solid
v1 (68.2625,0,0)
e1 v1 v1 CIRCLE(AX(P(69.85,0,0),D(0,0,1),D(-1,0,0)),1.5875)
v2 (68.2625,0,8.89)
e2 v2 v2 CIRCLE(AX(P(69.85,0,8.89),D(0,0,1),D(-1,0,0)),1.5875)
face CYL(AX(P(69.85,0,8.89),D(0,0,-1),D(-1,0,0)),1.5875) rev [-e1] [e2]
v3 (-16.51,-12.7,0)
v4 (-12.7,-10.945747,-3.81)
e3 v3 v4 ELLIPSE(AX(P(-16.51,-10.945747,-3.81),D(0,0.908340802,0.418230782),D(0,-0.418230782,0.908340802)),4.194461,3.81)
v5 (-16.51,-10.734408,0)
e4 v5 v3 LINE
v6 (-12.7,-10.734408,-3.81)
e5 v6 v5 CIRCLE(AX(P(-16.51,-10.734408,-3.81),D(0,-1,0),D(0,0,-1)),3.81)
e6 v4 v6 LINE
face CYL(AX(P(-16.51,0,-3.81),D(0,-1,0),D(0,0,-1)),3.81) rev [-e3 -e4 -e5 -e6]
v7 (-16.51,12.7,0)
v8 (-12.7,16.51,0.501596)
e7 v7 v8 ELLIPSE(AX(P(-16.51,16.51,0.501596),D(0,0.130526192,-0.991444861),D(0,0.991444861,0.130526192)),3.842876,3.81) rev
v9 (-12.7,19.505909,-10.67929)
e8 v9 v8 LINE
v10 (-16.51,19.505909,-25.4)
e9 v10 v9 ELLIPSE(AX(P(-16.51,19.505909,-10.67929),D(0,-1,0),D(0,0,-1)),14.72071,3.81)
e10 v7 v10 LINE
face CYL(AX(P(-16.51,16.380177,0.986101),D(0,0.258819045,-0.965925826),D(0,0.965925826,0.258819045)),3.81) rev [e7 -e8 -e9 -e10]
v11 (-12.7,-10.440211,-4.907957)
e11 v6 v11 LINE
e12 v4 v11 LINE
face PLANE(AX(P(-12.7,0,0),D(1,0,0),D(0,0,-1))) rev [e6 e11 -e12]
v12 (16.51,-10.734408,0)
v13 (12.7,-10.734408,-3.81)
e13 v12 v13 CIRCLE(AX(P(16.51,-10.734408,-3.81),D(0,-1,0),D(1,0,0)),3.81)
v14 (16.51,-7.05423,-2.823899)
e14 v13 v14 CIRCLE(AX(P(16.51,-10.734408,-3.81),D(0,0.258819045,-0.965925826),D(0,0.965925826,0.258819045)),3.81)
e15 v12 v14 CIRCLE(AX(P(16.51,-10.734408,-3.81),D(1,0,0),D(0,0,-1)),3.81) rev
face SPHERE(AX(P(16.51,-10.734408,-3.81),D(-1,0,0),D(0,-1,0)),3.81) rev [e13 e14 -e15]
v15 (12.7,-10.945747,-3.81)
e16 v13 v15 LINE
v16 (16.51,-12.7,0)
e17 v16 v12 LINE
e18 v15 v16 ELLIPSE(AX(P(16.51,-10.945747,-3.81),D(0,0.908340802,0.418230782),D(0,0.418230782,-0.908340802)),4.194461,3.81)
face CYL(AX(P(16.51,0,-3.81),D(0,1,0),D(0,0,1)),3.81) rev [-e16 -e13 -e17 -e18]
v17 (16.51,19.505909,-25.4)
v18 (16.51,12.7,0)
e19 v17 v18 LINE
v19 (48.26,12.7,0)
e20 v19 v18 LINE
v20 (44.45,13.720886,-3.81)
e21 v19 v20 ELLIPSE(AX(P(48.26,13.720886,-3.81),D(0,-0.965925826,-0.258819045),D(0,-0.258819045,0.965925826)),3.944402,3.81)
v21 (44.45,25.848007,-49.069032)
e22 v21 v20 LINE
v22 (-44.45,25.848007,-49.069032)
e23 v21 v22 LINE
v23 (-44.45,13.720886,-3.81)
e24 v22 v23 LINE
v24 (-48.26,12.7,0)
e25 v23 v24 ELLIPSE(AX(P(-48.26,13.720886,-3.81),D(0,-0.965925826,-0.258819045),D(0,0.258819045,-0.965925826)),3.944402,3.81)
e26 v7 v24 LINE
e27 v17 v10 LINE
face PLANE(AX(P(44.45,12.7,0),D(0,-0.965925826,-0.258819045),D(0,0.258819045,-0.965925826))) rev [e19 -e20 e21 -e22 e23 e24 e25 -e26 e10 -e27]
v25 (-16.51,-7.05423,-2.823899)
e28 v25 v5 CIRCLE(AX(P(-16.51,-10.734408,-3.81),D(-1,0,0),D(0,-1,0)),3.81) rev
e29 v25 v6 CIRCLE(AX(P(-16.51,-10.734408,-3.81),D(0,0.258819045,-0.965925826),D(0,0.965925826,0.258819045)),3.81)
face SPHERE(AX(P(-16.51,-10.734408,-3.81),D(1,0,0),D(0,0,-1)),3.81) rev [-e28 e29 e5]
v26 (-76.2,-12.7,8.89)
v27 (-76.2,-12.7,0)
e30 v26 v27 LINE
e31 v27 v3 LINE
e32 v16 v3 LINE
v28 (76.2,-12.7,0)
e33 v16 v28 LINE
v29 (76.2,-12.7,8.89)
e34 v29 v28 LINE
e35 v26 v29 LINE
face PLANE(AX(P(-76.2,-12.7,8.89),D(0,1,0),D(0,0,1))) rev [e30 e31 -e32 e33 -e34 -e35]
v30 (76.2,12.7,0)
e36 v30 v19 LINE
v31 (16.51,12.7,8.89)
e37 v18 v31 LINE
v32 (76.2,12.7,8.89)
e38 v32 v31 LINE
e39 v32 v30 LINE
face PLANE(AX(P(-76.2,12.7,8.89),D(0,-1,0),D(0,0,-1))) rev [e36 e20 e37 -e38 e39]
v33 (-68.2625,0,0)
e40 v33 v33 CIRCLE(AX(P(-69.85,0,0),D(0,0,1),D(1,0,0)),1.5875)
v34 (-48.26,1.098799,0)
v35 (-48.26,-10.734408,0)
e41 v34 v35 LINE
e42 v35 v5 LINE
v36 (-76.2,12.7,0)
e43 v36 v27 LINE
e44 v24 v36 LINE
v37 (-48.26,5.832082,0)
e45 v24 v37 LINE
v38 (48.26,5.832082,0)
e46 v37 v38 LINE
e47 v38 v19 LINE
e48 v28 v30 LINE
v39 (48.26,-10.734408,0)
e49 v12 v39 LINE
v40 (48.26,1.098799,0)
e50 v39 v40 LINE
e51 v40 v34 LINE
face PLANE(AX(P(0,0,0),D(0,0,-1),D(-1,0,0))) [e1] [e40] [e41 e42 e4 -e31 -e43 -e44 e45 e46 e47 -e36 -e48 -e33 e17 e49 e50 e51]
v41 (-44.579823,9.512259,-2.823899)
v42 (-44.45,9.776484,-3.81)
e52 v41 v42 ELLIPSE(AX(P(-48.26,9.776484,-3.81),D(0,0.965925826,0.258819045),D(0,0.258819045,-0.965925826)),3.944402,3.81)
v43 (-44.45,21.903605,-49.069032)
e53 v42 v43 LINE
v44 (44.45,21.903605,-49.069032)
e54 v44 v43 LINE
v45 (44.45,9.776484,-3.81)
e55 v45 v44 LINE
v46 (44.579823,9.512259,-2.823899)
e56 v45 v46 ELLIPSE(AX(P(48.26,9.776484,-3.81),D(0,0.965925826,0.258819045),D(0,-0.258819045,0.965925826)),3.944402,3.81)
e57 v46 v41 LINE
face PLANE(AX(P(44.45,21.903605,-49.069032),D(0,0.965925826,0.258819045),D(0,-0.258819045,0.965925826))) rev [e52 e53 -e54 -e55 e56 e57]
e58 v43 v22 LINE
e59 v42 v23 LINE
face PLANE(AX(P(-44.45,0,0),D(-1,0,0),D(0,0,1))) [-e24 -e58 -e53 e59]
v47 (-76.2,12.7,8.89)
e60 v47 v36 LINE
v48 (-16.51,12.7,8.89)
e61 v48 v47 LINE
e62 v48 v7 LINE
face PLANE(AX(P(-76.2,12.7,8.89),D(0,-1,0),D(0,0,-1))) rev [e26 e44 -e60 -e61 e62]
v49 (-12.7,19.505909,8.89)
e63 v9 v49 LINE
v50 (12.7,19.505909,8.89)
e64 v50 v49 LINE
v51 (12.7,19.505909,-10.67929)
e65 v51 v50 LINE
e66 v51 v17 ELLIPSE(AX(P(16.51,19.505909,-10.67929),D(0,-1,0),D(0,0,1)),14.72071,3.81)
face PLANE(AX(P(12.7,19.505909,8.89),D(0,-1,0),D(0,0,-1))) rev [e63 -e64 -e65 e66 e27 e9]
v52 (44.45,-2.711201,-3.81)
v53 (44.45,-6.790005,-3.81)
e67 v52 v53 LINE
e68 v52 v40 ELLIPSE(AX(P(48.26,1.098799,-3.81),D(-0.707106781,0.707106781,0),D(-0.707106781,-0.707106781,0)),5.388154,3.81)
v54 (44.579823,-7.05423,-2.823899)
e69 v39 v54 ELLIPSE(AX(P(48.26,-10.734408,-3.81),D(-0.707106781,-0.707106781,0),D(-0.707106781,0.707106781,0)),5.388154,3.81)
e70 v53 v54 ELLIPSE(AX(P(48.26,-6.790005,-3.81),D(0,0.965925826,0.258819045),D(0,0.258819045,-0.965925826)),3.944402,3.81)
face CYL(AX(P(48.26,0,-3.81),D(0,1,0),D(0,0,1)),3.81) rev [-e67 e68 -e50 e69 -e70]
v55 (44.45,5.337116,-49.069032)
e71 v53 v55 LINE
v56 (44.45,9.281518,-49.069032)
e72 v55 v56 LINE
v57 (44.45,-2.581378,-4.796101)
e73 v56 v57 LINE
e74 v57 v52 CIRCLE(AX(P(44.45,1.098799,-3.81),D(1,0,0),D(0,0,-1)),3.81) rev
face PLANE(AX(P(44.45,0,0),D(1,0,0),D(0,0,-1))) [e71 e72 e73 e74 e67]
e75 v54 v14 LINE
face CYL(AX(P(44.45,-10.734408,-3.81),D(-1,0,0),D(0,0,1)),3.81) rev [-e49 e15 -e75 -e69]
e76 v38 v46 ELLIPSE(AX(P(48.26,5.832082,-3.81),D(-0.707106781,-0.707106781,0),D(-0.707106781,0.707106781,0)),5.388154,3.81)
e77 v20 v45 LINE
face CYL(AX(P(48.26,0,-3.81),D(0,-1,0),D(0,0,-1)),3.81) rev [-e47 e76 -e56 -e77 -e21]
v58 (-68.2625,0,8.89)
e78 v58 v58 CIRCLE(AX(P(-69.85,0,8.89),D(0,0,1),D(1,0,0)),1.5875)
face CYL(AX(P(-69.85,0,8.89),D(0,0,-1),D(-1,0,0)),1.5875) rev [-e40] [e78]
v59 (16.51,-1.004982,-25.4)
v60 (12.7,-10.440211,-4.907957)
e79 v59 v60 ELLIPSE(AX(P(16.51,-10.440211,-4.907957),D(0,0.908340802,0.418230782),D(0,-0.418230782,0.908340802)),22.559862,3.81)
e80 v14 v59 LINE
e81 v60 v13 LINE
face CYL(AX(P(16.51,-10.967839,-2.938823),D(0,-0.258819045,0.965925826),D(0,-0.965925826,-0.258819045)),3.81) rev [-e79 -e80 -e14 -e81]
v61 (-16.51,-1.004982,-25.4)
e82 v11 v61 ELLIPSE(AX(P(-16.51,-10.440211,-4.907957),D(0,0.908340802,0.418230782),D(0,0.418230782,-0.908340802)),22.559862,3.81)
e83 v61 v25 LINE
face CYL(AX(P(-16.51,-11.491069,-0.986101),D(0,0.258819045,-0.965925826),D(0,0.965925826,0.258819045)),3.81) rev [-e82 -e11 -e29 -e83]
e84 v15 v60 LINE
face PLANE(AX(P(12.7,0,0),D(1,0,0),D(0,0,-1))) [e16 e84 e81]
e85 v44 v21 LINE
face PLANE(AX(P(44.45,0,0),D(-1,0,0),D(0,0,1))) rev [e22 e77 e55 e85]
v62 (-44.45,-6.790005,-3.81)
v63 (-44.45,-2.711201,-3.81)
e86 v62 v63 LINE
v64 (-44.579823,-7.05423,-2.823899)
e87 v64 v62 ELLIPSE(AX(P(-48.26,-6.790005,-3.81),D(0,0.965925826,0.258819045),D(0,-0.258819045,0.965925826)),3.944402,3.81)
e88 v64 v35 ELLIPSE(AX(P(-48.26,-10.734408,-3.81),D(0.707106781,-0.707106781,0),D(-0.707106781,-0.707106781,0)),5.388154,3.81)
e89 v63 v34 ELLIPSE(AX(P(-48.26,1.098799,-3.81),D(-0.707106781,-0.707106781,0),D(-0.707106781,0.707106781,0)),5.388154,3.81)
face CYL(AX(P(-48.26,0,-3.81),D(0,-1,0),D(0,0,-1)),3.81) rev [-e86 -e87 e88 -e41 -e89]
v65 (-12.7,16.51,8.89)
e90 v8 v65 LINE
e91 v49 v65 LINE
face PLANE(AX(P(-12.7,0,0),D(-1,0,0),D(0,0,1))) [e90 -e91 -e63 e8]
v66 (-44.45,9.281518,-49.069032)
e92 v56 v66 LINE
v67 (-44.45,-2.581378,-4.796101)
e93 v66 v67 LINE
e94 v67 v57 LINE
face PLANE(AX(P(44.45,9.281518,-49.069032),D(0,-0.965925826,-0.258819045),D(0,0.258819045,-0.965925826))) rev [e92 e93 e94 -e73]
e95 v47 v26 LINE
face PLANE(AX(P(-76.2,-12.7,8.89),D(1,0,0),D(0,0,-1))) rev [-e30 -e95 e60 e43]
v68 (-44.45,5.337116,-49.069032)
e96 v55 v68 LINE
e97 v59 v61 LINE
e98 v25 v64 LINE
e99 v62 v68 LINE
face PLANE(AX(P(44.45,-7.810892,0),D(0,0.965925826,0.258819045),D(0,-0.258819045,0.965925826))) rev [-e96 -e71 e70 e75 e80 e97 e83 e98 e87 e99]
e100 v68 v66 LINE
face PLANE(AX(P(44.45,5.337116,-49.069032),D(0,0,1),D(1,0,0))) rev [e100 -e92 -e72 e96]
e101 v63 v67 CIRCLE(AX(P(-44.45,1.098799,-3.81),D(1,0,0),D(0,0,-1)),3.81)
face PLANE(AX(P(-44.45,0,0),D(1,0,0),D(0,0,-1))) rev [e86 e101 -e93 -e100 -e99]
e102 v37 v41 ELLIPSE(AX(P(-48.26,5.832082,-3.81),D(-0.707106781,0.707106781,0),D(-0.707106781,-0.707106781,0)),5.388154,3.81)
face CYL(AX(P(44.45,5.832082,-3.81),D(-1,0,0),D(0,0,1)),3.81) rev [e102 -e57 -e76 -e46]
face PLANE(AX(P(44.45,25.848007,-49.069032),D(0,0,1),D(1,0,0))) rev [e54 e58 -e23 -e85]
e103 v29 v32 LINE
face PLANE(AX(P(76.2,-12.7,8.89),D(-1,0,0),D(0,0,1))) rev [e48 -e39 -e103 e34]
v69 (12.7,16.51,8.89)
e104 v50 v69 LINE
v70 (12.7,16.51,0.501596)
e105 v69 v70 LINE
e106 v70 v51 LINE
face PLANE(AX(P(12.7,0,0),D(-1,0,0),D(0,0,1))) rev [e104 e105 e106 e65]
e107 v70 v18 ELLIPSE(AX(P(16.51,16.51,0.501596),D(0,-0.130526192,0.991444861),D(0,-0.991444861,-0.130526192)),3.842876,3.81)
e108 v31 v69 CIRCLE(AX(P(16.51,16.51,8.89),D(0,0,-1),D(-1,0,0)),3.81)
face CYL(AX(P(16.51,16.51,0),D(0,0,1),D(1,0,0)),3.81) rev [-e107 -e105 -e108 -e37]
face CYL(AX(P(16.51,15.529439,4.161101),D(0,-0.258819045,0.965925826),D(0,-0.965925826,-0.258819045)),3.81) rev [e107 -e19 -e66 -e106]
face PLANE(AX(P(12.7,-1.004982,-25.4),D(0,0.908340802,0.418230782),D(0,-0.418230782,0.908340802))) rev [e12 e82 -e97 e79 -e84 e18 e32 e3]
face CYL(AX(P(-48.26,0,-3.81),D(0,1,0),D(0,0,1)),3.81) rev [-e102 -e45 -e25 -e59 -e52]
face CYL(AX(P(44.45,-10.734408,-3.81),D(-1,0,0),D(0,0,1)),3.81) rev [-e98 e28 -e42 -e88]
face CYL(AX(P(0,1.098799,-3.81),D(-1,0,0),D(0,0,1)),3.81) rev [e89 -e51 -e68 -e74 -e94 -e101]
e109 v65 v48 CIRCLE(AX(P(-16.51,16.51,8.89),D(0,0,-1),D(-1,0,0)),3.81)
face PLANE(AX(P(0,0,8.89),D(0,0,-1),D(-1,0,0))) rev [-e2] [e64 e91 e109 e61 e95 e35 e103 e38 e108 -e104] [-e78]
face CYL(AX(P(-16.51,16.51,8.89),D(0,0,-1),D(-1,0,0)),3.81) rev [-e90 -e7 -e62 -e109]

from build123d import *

# Parameters (mm, degrees)
SKETCH1_W           = 152.4
SKETCH1_H           = 25.4
SKETCH1_R           = 1.5875
BOSS_EXTRUDE1_DEPTH = 8.89
BOSS_EXTRUDE2_DEPTH = 44.45
BOSS_EXTRUDE3_DEPTH = 12.7
FILLET1_R           = 3.81


with BuildPart() as part:
    # Sketch1 → Boss-Extrude1 (new body)
    with BuildSketch(Plane.XY):
        Rectangle(SKETCH1_W, SKETCH1_H)
        with Locations((-69.85, 0)):
            Circle(SKETCH1_R, mode=Mode.SUBTRACT)
        with Locations(Location((69.85, 0, 0), (0, 0, 180))):
            Circle(SKETCH1_R, mode=Mode.SUBTRACT)
    extrude(amount=BOSS_EXTRUDE1_DEPTH)

    # Sketch2 → Boss-Extrude2 (add, symmetric)
    with BuildSketch(Plane(origin=(0, 0, 0), x_dir=(0, 0, -1), z_dir=(1, 0, 0))):
        Polygon((0, 8.755597753), (0, 12.7), (49.069031975, 25.848007491), (49.069031975, 21.903605244), align=None)
        Polygon((0, -3.866489439), (0, -7.810891686), (49.069031975, 5.337115805), (49.069031975, 9.281518052), align=None)
    extrude(amount=BOSS_EXTRUDE2_DEPTH, both=True)

    # Sketch3 → Boss-Extrude3 (add, symmetric)
    with BuildSketch(Plane(origin=(0, 0, 0), x_dir=(0, 0, -1), z_dir=(1, 0, 0))):
        Polygon((-8.89, 12.7), (-8.89, 19.505909488), (25.4, 19.505909488), (0, 12.7), align=None)
        Polygon((25.4, -1.004982199), (0, -12.7), (0, -7.810891686), align=None)
    extrude(amount=BOSS_EXTRUDE3_DEPTH, both=True)

    # Fillet1
    # the kernel refuses this fillet: 3.81 mm, written as the material it adds along each edge
    with BuildSketch(Plane(origin=(16.51, -10.73440751, -3.81), x_dir=(0, 0, 1), z_dir=(-1, 0, 0))) as fillet1_piece_1_section:
        Polygon((0, 0), (FILLET1_R, 0), (FILLET1_R, FILLET1_R * 0.767326987979), (FILLET1_R * 0.258819045103, FILLET1_R * 0.965925826289), align=None)
    fillet1_piece_1 = extrude(amount=FILLET1_R, mode=Mode.PRIVATE)
    fillet1_piece_1 = fillet1_piece_1 - Plane(origin=(16.51, -10.73440751, -3.81), x_dir=(0, -0.6087614290087219, -0.7933533402912344), z_dir=(-1, 0, 0)) * Sphere(FILLET1_R, mode=Mode.PRIVATE)
    add(fillet1_piece_1)
    with BuildSketch(Plane(origin=(-16.51, -10.73440751, -3.81), x_dir=(0, 0, 1), z_dir=(1, 0, 0))) as fillet1_piece_2_section:
        Polygon((0, 0), (FILLET1_R, 0), (FILLET1_R, -FILLET1_R * 0.767326987979), (FILLET1_R * 0.258819045103, -FILLET1_R * 0.965925826289), align=None)
    fillet1_piece_2 = extrude(amount=FILLET1_R, mode=Mode.PRIVATE)
    fillet1_piece_2 = fillet1_piece_2 - Plane(origin=(-16.51, -10.73440751, -3.81), x_dir=(0, -0.6087614290087219, -0.7933533402912344), z_dir=(1, 0, 0)) * Sphere(FILLET1_R, mode=Mode.PRIVATE)
    add(fillet1_piece_2)
    with BuildSketch(Plane(origin=(-44.45, 8.755597753, 0), x_dir=(0, -1, 0), z_dir=(1, 0, 0))) as fillet1_piece_3:
        with BuildLine():
            CenterArc((FILLET1_R * 0.767326987979, FILLET1_R), FILLET1_R, 195, 75)
            Line((-FILLET1_R * 0.19859883831, FILLET1_R * 0.741180954897), (0, 0))
            Line((0, 0), (FILLET1_R * 0.767326987979, 0))
        make_face()
    extrude(amount=88.9)
    with BuildSketch(Plane(origin=(-44.45, -0.769402247, 0), x_dir=(-1, 0, 0), z_dir=(0, 1, 0))) as fillet1_piece_4_section:
        with BuildLine():
            CenterArc((FILLET1_R, -FILLET1_R), FILLET1_R, 90, 90)
            Line((0, -FILLET1_R), (0, 0))
            Line((0, 0), (FILLET1_R, 0))
        make_face()
    fillet1_piece_4 = extrude(amount=13.469402247, mode=Mode.PRIVATE)
    fillet1_piece_4 = split(fillet1_piece_4, bisect_by=Plane(origin=(-45.341111067, 12.778682572, -0.293647356), z_dir=(0, -0.9659258262890691, -0.25881904510251785)), keep=Keep.TOP, mode=Mode.PRIVATE)
    fillet1_piece_4 = split(fillet1_piece_4, bisect_by=Plane(origin=(-45.341111067, 9.098505174, -1.279747918), z_dir=(0, 0.9659258262890691, 0.258819045102518)), keep=Keep.TOP, mode=Mode.PRIVATE)
    add(fillet1_piece_4)
    with BuildSketch(Plane(origin=(-44.45, -0.769402247, 0), x_dir=(-1, 0, 0), z_dir=(0, 1, 0))) as fillet1_piece_5_section:
        with BuildLine():
            CenterArc((FILLET1_R, -FILLET1_R), FILLET1_R, 90, 90)
            Line((0, -FILLET1_R), (0, 0))
            Line((0, 0), (FILLET1_R, 0))
        make_face()
    fillet1_piece_5 = extrude(amount=22.994402247, mode=Mode.PRIVATE)
    fillet1_piece_5 = split(fillet1_piece_5, bisect_by=Plane(origin=(-44.855660273, 12.7, -1.638749777), z_dir=(0, 1, 0)), keep=Keep.TOP, mode=Mode.PRIVATE)
    fillet1_piece_5 = split(fillet1_piece_5, bisect_by=Plane(origin=(-44.855660273, 13.124394562, -1.583862067), z_dir=(0, -0.9659258262890691, -0.25881904510251785)), keep=Keep.TOP, mode=Mode.PRIVATE)
    add(fillet1_piece_5)
    with BuildSketch(Plane(origin=(44.45, -0.769402247, 0), x_dir=(1, 0, 0), z_dir=(0, 1, 0))) as fillet1_piece_6_section:
        with BuildLine():
            CenterArc((FILLET1_R, FILLET1_R), FILLET1_R, 180, 90)
            Line((0, FILLET1_R), (0, 0))
            Line((0, 0), (FILLET1_R, 0))
        make_face()
    fillet1_piece_6 = extrude(amount=13.469402247, mode=Mode.PRIVATE)
    fillet1_piece_6 = split(fillet1_piece_6, bisect_by=Plane(origin=(45.341111067, 9.098505174, -1.279747918), z_dir=(0, 0.9659258262890691, 0.258819045102518)), keep=Keep.TOP, mode=Mode.PRIVATE)
    fillet1_piece_6 = split(fillet1_piece_6, bisect_by=Plane(origin=(45.341111067, 12.778682572, -0.293647356), z_dir=(0, -0.9659258262890691, -0.25881904510251785)), keep=Keep.TOP, mode=Mode.PRIVATE)
    add(fillet1_piece_6)
    with BuildSketch(Plane(origin=(44.45, -0.769402247, 0), x_dir=(1, 0, 0), z_dir=(0, 1, 0))) as fillet1_piece_7_section:
        with BuildLine():
            CenterArc((FILLET1_R, FILLET1_R), FILLET1_R, 180, 90)
            Line((0, FILLET1_R), (0, 0))
            Line((0, 0), (FILLET1_R, 0))
        make_face()
    fillet1_piece_7 = extrude(amount=22.994402247, mode=Mode.PRIVATE)
    fillet1_piece_7 = split(fillet1_piece_7, bisect_by=Plane(origin=(44.855660273, 12.7, -1.638749777), z_dir=(0, 1, 0)), keep=Keep.TOP, mode=Mode.PRIVATE)
    fillet1_piece_7 = split(fillet1_piece_7, bisect_by=Plane(origin=(44.855660273, 13.124394562, -1.583862067), z_dir=(0, -0.9659258262890691, -0.25881904510251785)), keep=Keep.TOP, mode=Mode.PRIVATE)
    add(fillet1_piece_7)
    with BuildSketch(Plane(origin=(-44.45, 5.658510561, 0), x_dir=(-1, 0, 0), z_dir=(0, -1, 0))) as fillet1_piece_8_section:
        with BuildLine():
            CenterArc((FILLET1_R, FILLET1_R), FILLET1_R, 180, 90)
            Line((0, FILLET1_R), (0, 0))
            Line((0, 0), (FILLET1_R, 0))
        make_face()
    fillet1_piece_8 = extrude(amount=22.994402247, mode=Mode.PRIVATE)
    fillet1_piece_8 = split(fillet1_piece_8, bisect_by=Plane(origin=(-45.312565385, -7.447655563, -1.355615666), z_dir=(0, 0.9659258262890691, 0.25881904510251813)), keep=Keep.TOP, mode=Mode.PRIVATE)
    fillet1_piece_8 = split(fillet1_piece_8, bisect_by=Plane(origin=(-45.312565385, -3.767478165, -0.369515104), z_dir=(0, -0.9659258262890691, -0.2588190451025181)), keep=Keep.TOP, mode=Mode.PRIVATE)
    add(fillet1_piece_8)
    with BuildSketch(Plane(origin=(44.45, -3.866489439, 0), x_dir=(0, 1, 0), z_dir=(-1, 0, 0))) as fillet1_piece_9:
        with BuildLine():
            CenterArc((FILLET1_R * 1.30322537284, FILLET1_R), FILLET1_R, 165, 105)
            Line((FILLET1_R * 0.337299546552, FILLET1_R * 1.2588190451), (0, 0))
            Line((0, 0), (FILLET1_R * 1.30322537284, 0))
        make_face()
    extrude(amount=88.9)
    with BuildSketch(Plane(origin=(16.51, -7.810891686, 0), x_dir=(0, -1, 0), z_dir=(1, 0, 0)), Plane(origin=(-44.45, -7.810891686, 0), x_dir=(0, -1, 0), z_dir=(1, 0, 0))) as fillet1_piece_10:
        with BuildLine():
            CenterArc((FILLET1_R * 0.767326987979, FILLET1_R), FILLET1_R, 195, 75)
            Line((-FILLET1_R * 0.19859883831, FILLET1_R * 0.741180954897), (0, 0))
            Line((0, 0), (FILLET1_R * 0.767326987979, 0))
        make_face()
    extrude(amount=27.94)
    with BuildSketch(Plane(origin=(44.45, 5.658510561, 0), x_dir=(1, 0, 0), z_dir=(0, -1, 0))) as fillet1_piece_11_section:
        with BuildLine():
            CenterArc((FILLET1_R, -FILLET1_R), FILLET1_R, 90, 90)
            Line((0, -FILLET1_R), (0, 0))
            Line((0, 0), (FILLET1_R, 0))
        make_face()
    fillet1_piece_11 = extrude(amount=22.994402247, mode=Mode.PRIVATE)
    fillet1_piece_11 = split(fillet1_piece_11, bisect_by=Plane(origin=(45.312565385, -7.447655563, -1.355615666), z_dir=(0, 0.9659258262890691, 0.25881904510251813)), keep=Keep.TOP, mode=Mode.PRIVATE)
    fillet1_piece_11 = split(fillet1_piece_11, bisect_by=Plane(origin=(45.312565385, -3.767478165, -0.369515104), z_dir=(0, -0.9659258262890691, -0.2588190451025181)), keep=Keep.TOP, mode=Mode.PRIVATE)
    add(fillet1_piece_11)
    with BuildSketch(Plane(origin=(-12.7, 12.7, -9.525), x_dir=(-1, 0, 0), z_dir=(0, 0, 1))) as fillet1_piece_12:
        with BuildLine():
            CenterArc((FILLET1_R, -FILLET1_R), FILLET1_R, 90, 90)
            Line((0, -FILLET1_R), (0, 0))
            Line((0, 0), (FILLET1_R, 0))
        make_face()
    extrude(amount=18.415)
    with BuildSketch(Plane(origin=(-12.7, 21.971160892, -34.600443495), x_dir=(0, 0.9659258262890691, 0.2588190451025179), z_dir=(0, -0.2588190451025179, 0.9659258262890691))) as fillet1_piece_13_section:
        with BuildLine():
            CenterArc((FILLET1_R, FILLET1_R), FILLET1_R, 180, 90)
            Line((0, FILLET1_R), (0, 0))
            Line((0, 0), (FILLET1_R, 0))
        make_face()
    fillet1_piece_13 = extrude(amount=45.346014982, mode=Mode.PRIVATE)
    fillet1_piece_13 = split(fillet1_piece_13, bisect_by=Plane(origin=(-13.567705221, 16.120661603, 8.89), z_dir=(0, 0, -1)), keep=Keep.TOP, mode=Mode.PRIVATE)
    fillet1_piece_13 = split(fillet1_piece_13, bisect_by=Plane(origin=(-13.567705221, 19.505909488, -9.486038737), z_dir=(0, -1, 0)), keep=Keep.TOP, mode=Mode.PRIVATE)
    add(fillet1_piece_13)
    with BuildSketch(Plane(origin=(12.7, 12.7, -9.525), x_dir=(1, 0, 0), z_dir=(0, 0, 1))) as fillet1_piece_14:
        with BuildLine():
            CenterArc((FILLET1_R, FILLET1_R), FILLET1_R, 180, 90)
            Line((0, FILLET1_R), (0, 0))
            Line((0, 0), (FILLET1_R, 0))
        make_face()
    extrude(amount=18.415)
    with BuildSketch(Plane(origin=(12.7, 21.971160892, -34.600443495), x_dir=(1, 0, 0), z_dir=(0, -0.2588190451025179, 0.9659258262890691))) as fillet1_piece_15_section:
        with BuildLine():
            CenterArc((FILLET1_R, FILLET1_R), FILLET1_R, 180, 90)
            Line((0, FILLET1_R), (0, 0))
            Line((0, 0), (FILLET1_R, 0))
        make_face()
    fillet1_piece_15 = extrude(amount=45.346014982, mode=Mode.PRIVATE)
    fillet1_piece_15 = split(fillet1_piece_15, bisect_by=Plane(origin=(13.56770522, 16.120661606, 8.89), z_dir=(0, 0, -1)), keep=Keep.TOP, mode=Mode.PRIVATE)
    fillet1_piece_15 = split(fillet1_piece_15, bisect_by=Plane(origin=(13.56770522, 19.505909488, -9.486038751), z_dir=(0, -1, 0)), keep=Keep.TOP, mode=Mode.PRIVATE)
    add(fillet1_piece_15)
    with BuildSketch(Plane(origin=(-12.7, -7.054230112, -2.823899438), x_dir=(-1, 0, 0), z_dir=(0, 0.2588190451025182, -0.965925826289069))) as fillet1_piece_16_section:
        with BuildLine():
            CenterArc((FILLET1_R, -FILLET1_R), FILLET1_R, 90, 90)
            Line((0, -FILLET1_R), (0, 0))
            Line((0, 0), (FILLET1_R, 0))
        make_face()
    fillet1_piece_16 = extrude(amount=32.897499158, mode=Mode.PRIVATE)
    fillet1_piece_16 = split(fillet1_piece_16, bisect_by=Plane(origin=(-13.689407804, -6.647394043, -13.145443122), z_dir=(0, 0.9083408023896492, 0.41823078164349436)), keep=Keep.TOP, mode=Mode.PRIVATE)
    add(fillet1_piece_16)
    with BuildSketch(Plane(origin=(-12.7, -12.7, 0), x_dir=(-1, 0, 0), z_dir=(0, 1, 0))) as fillet1_piece_17_section:
        with BuildLine():
            CenterArc((FILLET1_R, -FILLET1_R), FILLET1_R, 90, 90)
            Line((0, -FILLET1_R), (0, 0))
            Line((0, 0), (FILLET1_R, 0))
        make_face()
    fillet1_piece_17 = extrude(amount=1.96559249, mode=Mode.PRIVATE)
    fillet1_piece_17 = split(fillet1_piece_17, bisect_by=Plane(origin=(-13.67877404, -12.248464892, -0.980673303), z_dir=(0, 0.9083408023896492, 0.41823078164349436)), keep=Keep.TOP, mode=Mode.PRIVATE)
    add(fillet1_piece_17)
    with BuildSketch(Plane(origin=(12.7, -7.054230112, -2.823899438), x_dir=(0, -0.965925826289069, -0.2588190451025182), z_dir=(0, 0.2588190451025182, -0.965925826289069))) as fillet1_piece_18_section:
        with BuildLine():
            CenterArc((FILLET1_R, -FILLET1_R), FILLET1_R, 90, 90)
            Line((0, -FILLET1_R), (0, 0))
            Line((0, 0), (FILLET1_R, 0))
        make_face()
    fillet1_piece_18 = extrude(amount=32.897499158, mode=Mode.PRIVATE)
    fillet1_piece_18 = split(fillet1_piece_18, bisect_by=Plane(origin=(13.689407804, -6.647394043, -13.145443122), z_dir=(0, 0.9083408023896492, 0.41823078164349436)), keep=Keep.TOP, mode=Mode.PRIVATE)
    add(fillet1_piece_18)
    with BuildSketch(Plane(origin=(12.7, -12.7, 0), x_dir=(1, 0, 0), z_dir=(0, 1, 0))) as fillet1_piece_19_section:
        with BuildLine():
            CenterArc((FILLET1_R, FILLET1_R), FILLET1_R, 180, 90)
            Line((0, FILLET1_R), (0, 0))
            Line((0, 0), (FILLET1_R, 0))
        make_face()
    fillet1_piece_19 = extrude(amount=1.96559249, mode=Mode.PRIVATE)
    fillet1_piece_19 = split(fillet1_piece_19, bisect_by=Plane(origin=(13.67877404, -12.248464892, -0.980673303), z_dir=(0, 0.9083408023896492, 0.41823078164349436)), keep=Keep.TOP, mode=Mode.PRIVATE)
    add(fillet1_piece_19)
    with BuildSketch(Plane(origin=(-44.45, -0.769402247, 0), x_dir=(-1, 0, 0), z_dir=(0, 1, 0))) as fillet1_piece_20a_section:
        with BuildLine():
            CenterArc((FILLET1_R, -FILLET1_R), FILLET1_R, 90, 90)
            Line((0, -FILLET1_R), (0, 0))
            Line((0, 0), (FILLET1_R, 0))
        make_face()
    fillet1_piece_20a = extrude(amount=13.469402247, mode=Mode.PRIVATE)
    fillet1_piece_20a = split(fillet1_piece_20a, bisect_by=Plane(origin=(-45.301618927, 8.664751894, 0.339041359), z_dir=(0, -0.9659258262890691, -0.258819045102518)), keep=Keep.TOP, mode=Mode.PRIVATE)
    with BuildSketch(Plane(origin=(-51.75878956, 8.755597753, 0), x_dir=(0, -1, 0), z_dir=(1, 0, 0))) as fillet1_piece_20b_section:
        with BuildLine():
            CenterArc((FILLET1_R * 0.767326987979, FILLET1_R), FILLET1_R, 195, 75)
            Line((-FILLET1_R * 0.19859883831, FILLET1_R * 0.741180954897), (0, 0))
            Line((0, 0), (FILLET1_R * 0.767326987979, 0))
        make_face()
    fillet1_piece_20b = extrude(amount=96.20878956, mode=Mode.PRIVATE)
    fillet1_piece_20b = split(fillet1_piece_20b, bisect_by=Plane(origin=(-44.45, 8.277292098, -0.623340065), z_dir=(-1, 0, 0)), keep=Keep.TOP, mode=Mode.PRIVATE)
    fillet1_piece_20 = fillet1_piece_20a & fillet1_piece_20b
    add(fillet1_piece_20)
    with BuildSketch(Plane(origin=(-44.45, 8.755597753, 0), x_dir=(0, -1, 0), z_dir=(1, 0, 0))) as fillet1_piece_21a_section:
        with BuildLine():
            CenterArc((FILLET1_R * 0.767326987979, FILLET1_R), FILLET1_R, 195, 75)
            Line((-FILLET1_R * 0.19859883831, FILLET1_R * 0.741180954897), (0, 0))
            Line((0, 0), (FILLET1_R * 0.767326987979, 0))
        make_face()
    fillet1_piece_21a = extrude(amount=96.20878956, mode=Mode.PRIVATE)
    fillet1_piece_21a = split(fillet1_piece_21a, bisect_by=Plane(origin=(44.45, 8.277292098, -0.623340065), z_dir=(1, 0, 0)), keep=Keep.TOP, mode=Mode.PRIVATE)
    with BuildSketch(Plane(origin=(44.45, -0.769402247, 0), x_dir=(1, 0, 0), z_dir=(0, 1, 0))) as fillet1_piece_21b_section:
        with BuildLine():
            CenterArc((FILLET1_R, FILLET1_R), FILLET1_R, 180, 90)
            Line((0, FILLET1_R), (0, 0))
            Line((0, 0), (FILLET1_R, 0))
        make_face()
    fillet1_piece_21b = extrude(amount=13.469402247, mode=Mode.PRIVATE)
    fillet1_piece_21b = split(fillet1_piece_21b, bisect_by=Plane(origin=(45.301618927, 8.664751894, 0.339041359), z_dir=(0, -0.9659258262890691, -0.258819045102518)), keep=Keep.TOP, mode=Mode.PRIVATE)
    fillet1_piece_21 = fillet1_piece_21a & fillet1_piece_21b
    add(fillet1_piece_21)
    with BuildSketch(Plane(origin=(44.45, -3.866489439, 0), x_dir=(0, 1, 0), z_dir=(-1, 0, 0))) as fillet1_piece_22a_section:
        with BuildLine():
            CenterArc((FILLET1_R * 1.30322537284, FILLET1_R), FILLET1_R, 165, 105)
            Line((FILLET1_R * 0.337299546552, FILLET1_R * 1.2588190451), (0, 0))
            Line((0, 0), (FILLET1_R * 1.30322537284, 0))
        make_face()
    fillet1_piece_22a = extrude(amount=101.313221676, mode=Mode.PRIVATE)
    fillet1_piece_22a = split(fillet1_piece_22a, bisect_by=Plane(origin=(-44.45, -2.401293956, -1.124284037), z_dir=(-1, 0, 0)), keep=Keep.TOP, mode=Mode.PRIVATE)
    with BuildSketch(Plane(origin=(-44.45, 5.658510561, 0), x_dir=(-1, 0, 0), z_dir=(0, -1, 0))) as fillet1_piece_22b_section:
        with BuildLine():
            CenterArc((FILLET1_R, FILLET1_R), FILLET1_R, 180, 90)
            Line((0, FILLET1_R), (0, 0))
            Line((0, 0), (FILLET1_R, 0))
        make_face()
    fillet1_piece_22b = extrude(amount=22.994402247, mode=Mode.PRIVATE)
    fillet1_piece_22b = split(fillet1_piece_22b, bisect_by=Plane(origin=(-45.324056285, -3.329117204, -2.005500483), z_dir=(0, 0.9659258262890691, 0.2588190451025181)), keep=Keep.TOP, mode=Mode.PRIVATE)
    fillet1_piece_22 = fillet1_piece_22a & fillet1_piece_22b
    add(fillet1_piece_22)
    with BuildSketch(Plane(origin=(-44.45, 5.658510561, 0), x_dir=(-1, 0, 0), z_dir=(0, -1, 0))) as fillet1_piece_23a_section:
        with BuildLine():
            CenterArc((FILLET1_R, FILLET1_R), FILLET1_R, 180, 90)
            Line((0, FILLET1_R), (0, 0))
            Line((0, 0), (FILLET1_R, 0))
        make_face()
    fillet1_piece_23a = extrude(amount=22.994402247, mode=Mode.PRIVATE)
    fillet1_piece_23a = split(fillet1_piece_23a, bisect_by=Plane(origin=(-45.291707933, -12.7, -0.897871299), z_dir=(0, 1, 0)), keep=Keep.TOP, mode=Mode.PRIVATE)
    fillet1_piece_23a = split(fillet1_piece_23a, bisect_by=Plane(origin=(-45.291707933, -7.742119907, -0.256659773), z_dir=(0, -0.9659258262890691, -0.25881904510251813)), keep=Keep.TOP, mode=Mode.PRIVATE)
    with BuildSketch(Plane(origin=(-51.75878956, -7.810891686, 0), x_dir=(0, -1, 0), z_dir=(1, 0, 0))) as fillet1_piece_23b_section:
        with BuildLine():
            CenterArc((FILLET1_R * 0.767326987979, FILLET1_R), FILLET1_R, 195, 75)
            Line((-FILLET1_R * 0.19859883831, FILLET1_R * 0.741180954897), (0, 0))
            Line((0, 0), (FILLET1_R * 0.767326987979, 0))
        make_face()
    fillet1_piece_23b = extrude(amount=35.24878956, mode=Mode.PRIVATE)
    fillet1_piece_23b = split(fillet1_piece_23b, bisect_by=Plane(origin=(-44.45, -8.289197341, -0.623340065), z_dir=(-1, 0, 0)), keep=Keep.TOP, mode=Mode.PRIVATE)
    fillet1_piece_23 = fillet1_piece_23a & fillet1_piece_23b
    add(fillet1_piece_23)
    with BuildSketch(Plane(origin=(44.45, 5.658510561, 0), x_dir=(1, 0, 0), z_dir=(0, -1, 0))) as fillet1_piece_24a_section:
        with BuildLine():
            CenterArc((FILLET1_R, -FILLET1_R), FILLET1_R, 90, 90)
            Line((0, -FILLET1_R), (0, 0))
            Line((0, 0), (FILLET1_R, 0))
        make_face()
    fillet1_piece_24a = extrude(amount=22.994402247, mode=Mode.PRIVATE)
    fillet1_piece_24a = split(fillet1_piece_24a, bisect_by=Plane(origin=(45.324056285, -3.329117204, -2.005500483), z_dir=(0, 0.9659258262890691, 0.2588190451025181)), keep=Keep.TOP, mode=Mode.PRIVATE)
    with BuildSketch(Plane(origin=(56.863221676, -3.866489439, 0), x_dir=(0, 1, 0), z_dir=(-1, 0, 0))) as fillet1_piece_24b_section:
        with BuildLine():
            CenterArc((FILLET1_R * 1.30322537284, FILLET1_R), FILLET1_R, 165, 105)
            Line((FILLET1_R * 0.337299546552, FILLET1_R * 1.2588190451), (0, 0))
            Line((0, 0), (FILLET1_R * 1.30322537284, 0))
        make_face()
    fillet1_piece_24b = extrude(amount=101.313221676, mode=Mode.PRIVATE)
    fillet1_piece_24b = split(fillet1_piece_24b, bisect_by=Plane(origin=(44.45, -2.401293956, -1.124284037), z_dir=(1, 0, 0)), keep=Keep.TOP, mode=Mode.PRIVATE)
    fillet1_piece_24 = fillet1_piece_24a & fillet1_piece_24b
    add(fillet1_piece_24)
    with BuildSketch(Plane(origin=(16.51, -7.810891686, 0), x_dir=(0, -1, 0), z_dir=(1, 0, 0))) as fillet1_piece_25a_section:
        with BuildLine():
            CenterArc((FILLET1_R * 0.767326987979, FILLET1_R), FILLET1_R, 195, 75)
            Line((-FILLET1_R * 0.19859883831, FILLET1_R * 0.741180954897), (0, 0))
            Line((0, 0), (FILLET1_R * 0.767326987979, 0))
        make_face()
    fillet1_piece_25a = extrude(amount=35.24878956, mode=Mode.PRIVATE)
    fillet1_piece_25a = split(fillet1_piece_25a, bisect_by=Plane(origin=(44.45, -8.289197341, -0.623340065), z_dir=(1, 0, 0)), keep=Keep.TOP, mode=Mode.PRIVATE)
    with BuildSketch(Plane(origin=(44.45, 5.658510561, 0), x_dir=(1, 0, 0), z_dir=(0, -1, 0))) as fillet1_piece_25b_section:
        with BuildLine():
            CenterArc((FILLET1_R, -FILLET1_R), FILLET1_R, 90, 90)
            Line((0, -FILLET1_R), (0, 0))
            Line((0, 0), (FILLET1_R, 0))
        make_face()
    fillet1_piece_25b = extrude(amount=22.994402247, mode=Mode.PRIVATE)
    fillet1_piece_25b = split(fillet1_piece_25b, bisect_by=Plane(origin=(45.291707933, -12.7, -0.897871299), z_dir=(0, 1, 0)), keep=Keep.TOP, mode=Mode.PRIVATE)
    fillet1_piece_25b = split(fillet1_piece_25b, bisect_by=Plane(origin=(45.291707933, -7.742119907, -0.256659773), z_dir=(0, -0.9659258262890691, -0.25881904510251813)), keep=Keep.TOP, mode=Mode.PRIVATE)
    fillet1_piece_25 = fillet1_piece_25a & fillet1_piece_25b
    add(fillet1_piece_25)


solid = part.part
